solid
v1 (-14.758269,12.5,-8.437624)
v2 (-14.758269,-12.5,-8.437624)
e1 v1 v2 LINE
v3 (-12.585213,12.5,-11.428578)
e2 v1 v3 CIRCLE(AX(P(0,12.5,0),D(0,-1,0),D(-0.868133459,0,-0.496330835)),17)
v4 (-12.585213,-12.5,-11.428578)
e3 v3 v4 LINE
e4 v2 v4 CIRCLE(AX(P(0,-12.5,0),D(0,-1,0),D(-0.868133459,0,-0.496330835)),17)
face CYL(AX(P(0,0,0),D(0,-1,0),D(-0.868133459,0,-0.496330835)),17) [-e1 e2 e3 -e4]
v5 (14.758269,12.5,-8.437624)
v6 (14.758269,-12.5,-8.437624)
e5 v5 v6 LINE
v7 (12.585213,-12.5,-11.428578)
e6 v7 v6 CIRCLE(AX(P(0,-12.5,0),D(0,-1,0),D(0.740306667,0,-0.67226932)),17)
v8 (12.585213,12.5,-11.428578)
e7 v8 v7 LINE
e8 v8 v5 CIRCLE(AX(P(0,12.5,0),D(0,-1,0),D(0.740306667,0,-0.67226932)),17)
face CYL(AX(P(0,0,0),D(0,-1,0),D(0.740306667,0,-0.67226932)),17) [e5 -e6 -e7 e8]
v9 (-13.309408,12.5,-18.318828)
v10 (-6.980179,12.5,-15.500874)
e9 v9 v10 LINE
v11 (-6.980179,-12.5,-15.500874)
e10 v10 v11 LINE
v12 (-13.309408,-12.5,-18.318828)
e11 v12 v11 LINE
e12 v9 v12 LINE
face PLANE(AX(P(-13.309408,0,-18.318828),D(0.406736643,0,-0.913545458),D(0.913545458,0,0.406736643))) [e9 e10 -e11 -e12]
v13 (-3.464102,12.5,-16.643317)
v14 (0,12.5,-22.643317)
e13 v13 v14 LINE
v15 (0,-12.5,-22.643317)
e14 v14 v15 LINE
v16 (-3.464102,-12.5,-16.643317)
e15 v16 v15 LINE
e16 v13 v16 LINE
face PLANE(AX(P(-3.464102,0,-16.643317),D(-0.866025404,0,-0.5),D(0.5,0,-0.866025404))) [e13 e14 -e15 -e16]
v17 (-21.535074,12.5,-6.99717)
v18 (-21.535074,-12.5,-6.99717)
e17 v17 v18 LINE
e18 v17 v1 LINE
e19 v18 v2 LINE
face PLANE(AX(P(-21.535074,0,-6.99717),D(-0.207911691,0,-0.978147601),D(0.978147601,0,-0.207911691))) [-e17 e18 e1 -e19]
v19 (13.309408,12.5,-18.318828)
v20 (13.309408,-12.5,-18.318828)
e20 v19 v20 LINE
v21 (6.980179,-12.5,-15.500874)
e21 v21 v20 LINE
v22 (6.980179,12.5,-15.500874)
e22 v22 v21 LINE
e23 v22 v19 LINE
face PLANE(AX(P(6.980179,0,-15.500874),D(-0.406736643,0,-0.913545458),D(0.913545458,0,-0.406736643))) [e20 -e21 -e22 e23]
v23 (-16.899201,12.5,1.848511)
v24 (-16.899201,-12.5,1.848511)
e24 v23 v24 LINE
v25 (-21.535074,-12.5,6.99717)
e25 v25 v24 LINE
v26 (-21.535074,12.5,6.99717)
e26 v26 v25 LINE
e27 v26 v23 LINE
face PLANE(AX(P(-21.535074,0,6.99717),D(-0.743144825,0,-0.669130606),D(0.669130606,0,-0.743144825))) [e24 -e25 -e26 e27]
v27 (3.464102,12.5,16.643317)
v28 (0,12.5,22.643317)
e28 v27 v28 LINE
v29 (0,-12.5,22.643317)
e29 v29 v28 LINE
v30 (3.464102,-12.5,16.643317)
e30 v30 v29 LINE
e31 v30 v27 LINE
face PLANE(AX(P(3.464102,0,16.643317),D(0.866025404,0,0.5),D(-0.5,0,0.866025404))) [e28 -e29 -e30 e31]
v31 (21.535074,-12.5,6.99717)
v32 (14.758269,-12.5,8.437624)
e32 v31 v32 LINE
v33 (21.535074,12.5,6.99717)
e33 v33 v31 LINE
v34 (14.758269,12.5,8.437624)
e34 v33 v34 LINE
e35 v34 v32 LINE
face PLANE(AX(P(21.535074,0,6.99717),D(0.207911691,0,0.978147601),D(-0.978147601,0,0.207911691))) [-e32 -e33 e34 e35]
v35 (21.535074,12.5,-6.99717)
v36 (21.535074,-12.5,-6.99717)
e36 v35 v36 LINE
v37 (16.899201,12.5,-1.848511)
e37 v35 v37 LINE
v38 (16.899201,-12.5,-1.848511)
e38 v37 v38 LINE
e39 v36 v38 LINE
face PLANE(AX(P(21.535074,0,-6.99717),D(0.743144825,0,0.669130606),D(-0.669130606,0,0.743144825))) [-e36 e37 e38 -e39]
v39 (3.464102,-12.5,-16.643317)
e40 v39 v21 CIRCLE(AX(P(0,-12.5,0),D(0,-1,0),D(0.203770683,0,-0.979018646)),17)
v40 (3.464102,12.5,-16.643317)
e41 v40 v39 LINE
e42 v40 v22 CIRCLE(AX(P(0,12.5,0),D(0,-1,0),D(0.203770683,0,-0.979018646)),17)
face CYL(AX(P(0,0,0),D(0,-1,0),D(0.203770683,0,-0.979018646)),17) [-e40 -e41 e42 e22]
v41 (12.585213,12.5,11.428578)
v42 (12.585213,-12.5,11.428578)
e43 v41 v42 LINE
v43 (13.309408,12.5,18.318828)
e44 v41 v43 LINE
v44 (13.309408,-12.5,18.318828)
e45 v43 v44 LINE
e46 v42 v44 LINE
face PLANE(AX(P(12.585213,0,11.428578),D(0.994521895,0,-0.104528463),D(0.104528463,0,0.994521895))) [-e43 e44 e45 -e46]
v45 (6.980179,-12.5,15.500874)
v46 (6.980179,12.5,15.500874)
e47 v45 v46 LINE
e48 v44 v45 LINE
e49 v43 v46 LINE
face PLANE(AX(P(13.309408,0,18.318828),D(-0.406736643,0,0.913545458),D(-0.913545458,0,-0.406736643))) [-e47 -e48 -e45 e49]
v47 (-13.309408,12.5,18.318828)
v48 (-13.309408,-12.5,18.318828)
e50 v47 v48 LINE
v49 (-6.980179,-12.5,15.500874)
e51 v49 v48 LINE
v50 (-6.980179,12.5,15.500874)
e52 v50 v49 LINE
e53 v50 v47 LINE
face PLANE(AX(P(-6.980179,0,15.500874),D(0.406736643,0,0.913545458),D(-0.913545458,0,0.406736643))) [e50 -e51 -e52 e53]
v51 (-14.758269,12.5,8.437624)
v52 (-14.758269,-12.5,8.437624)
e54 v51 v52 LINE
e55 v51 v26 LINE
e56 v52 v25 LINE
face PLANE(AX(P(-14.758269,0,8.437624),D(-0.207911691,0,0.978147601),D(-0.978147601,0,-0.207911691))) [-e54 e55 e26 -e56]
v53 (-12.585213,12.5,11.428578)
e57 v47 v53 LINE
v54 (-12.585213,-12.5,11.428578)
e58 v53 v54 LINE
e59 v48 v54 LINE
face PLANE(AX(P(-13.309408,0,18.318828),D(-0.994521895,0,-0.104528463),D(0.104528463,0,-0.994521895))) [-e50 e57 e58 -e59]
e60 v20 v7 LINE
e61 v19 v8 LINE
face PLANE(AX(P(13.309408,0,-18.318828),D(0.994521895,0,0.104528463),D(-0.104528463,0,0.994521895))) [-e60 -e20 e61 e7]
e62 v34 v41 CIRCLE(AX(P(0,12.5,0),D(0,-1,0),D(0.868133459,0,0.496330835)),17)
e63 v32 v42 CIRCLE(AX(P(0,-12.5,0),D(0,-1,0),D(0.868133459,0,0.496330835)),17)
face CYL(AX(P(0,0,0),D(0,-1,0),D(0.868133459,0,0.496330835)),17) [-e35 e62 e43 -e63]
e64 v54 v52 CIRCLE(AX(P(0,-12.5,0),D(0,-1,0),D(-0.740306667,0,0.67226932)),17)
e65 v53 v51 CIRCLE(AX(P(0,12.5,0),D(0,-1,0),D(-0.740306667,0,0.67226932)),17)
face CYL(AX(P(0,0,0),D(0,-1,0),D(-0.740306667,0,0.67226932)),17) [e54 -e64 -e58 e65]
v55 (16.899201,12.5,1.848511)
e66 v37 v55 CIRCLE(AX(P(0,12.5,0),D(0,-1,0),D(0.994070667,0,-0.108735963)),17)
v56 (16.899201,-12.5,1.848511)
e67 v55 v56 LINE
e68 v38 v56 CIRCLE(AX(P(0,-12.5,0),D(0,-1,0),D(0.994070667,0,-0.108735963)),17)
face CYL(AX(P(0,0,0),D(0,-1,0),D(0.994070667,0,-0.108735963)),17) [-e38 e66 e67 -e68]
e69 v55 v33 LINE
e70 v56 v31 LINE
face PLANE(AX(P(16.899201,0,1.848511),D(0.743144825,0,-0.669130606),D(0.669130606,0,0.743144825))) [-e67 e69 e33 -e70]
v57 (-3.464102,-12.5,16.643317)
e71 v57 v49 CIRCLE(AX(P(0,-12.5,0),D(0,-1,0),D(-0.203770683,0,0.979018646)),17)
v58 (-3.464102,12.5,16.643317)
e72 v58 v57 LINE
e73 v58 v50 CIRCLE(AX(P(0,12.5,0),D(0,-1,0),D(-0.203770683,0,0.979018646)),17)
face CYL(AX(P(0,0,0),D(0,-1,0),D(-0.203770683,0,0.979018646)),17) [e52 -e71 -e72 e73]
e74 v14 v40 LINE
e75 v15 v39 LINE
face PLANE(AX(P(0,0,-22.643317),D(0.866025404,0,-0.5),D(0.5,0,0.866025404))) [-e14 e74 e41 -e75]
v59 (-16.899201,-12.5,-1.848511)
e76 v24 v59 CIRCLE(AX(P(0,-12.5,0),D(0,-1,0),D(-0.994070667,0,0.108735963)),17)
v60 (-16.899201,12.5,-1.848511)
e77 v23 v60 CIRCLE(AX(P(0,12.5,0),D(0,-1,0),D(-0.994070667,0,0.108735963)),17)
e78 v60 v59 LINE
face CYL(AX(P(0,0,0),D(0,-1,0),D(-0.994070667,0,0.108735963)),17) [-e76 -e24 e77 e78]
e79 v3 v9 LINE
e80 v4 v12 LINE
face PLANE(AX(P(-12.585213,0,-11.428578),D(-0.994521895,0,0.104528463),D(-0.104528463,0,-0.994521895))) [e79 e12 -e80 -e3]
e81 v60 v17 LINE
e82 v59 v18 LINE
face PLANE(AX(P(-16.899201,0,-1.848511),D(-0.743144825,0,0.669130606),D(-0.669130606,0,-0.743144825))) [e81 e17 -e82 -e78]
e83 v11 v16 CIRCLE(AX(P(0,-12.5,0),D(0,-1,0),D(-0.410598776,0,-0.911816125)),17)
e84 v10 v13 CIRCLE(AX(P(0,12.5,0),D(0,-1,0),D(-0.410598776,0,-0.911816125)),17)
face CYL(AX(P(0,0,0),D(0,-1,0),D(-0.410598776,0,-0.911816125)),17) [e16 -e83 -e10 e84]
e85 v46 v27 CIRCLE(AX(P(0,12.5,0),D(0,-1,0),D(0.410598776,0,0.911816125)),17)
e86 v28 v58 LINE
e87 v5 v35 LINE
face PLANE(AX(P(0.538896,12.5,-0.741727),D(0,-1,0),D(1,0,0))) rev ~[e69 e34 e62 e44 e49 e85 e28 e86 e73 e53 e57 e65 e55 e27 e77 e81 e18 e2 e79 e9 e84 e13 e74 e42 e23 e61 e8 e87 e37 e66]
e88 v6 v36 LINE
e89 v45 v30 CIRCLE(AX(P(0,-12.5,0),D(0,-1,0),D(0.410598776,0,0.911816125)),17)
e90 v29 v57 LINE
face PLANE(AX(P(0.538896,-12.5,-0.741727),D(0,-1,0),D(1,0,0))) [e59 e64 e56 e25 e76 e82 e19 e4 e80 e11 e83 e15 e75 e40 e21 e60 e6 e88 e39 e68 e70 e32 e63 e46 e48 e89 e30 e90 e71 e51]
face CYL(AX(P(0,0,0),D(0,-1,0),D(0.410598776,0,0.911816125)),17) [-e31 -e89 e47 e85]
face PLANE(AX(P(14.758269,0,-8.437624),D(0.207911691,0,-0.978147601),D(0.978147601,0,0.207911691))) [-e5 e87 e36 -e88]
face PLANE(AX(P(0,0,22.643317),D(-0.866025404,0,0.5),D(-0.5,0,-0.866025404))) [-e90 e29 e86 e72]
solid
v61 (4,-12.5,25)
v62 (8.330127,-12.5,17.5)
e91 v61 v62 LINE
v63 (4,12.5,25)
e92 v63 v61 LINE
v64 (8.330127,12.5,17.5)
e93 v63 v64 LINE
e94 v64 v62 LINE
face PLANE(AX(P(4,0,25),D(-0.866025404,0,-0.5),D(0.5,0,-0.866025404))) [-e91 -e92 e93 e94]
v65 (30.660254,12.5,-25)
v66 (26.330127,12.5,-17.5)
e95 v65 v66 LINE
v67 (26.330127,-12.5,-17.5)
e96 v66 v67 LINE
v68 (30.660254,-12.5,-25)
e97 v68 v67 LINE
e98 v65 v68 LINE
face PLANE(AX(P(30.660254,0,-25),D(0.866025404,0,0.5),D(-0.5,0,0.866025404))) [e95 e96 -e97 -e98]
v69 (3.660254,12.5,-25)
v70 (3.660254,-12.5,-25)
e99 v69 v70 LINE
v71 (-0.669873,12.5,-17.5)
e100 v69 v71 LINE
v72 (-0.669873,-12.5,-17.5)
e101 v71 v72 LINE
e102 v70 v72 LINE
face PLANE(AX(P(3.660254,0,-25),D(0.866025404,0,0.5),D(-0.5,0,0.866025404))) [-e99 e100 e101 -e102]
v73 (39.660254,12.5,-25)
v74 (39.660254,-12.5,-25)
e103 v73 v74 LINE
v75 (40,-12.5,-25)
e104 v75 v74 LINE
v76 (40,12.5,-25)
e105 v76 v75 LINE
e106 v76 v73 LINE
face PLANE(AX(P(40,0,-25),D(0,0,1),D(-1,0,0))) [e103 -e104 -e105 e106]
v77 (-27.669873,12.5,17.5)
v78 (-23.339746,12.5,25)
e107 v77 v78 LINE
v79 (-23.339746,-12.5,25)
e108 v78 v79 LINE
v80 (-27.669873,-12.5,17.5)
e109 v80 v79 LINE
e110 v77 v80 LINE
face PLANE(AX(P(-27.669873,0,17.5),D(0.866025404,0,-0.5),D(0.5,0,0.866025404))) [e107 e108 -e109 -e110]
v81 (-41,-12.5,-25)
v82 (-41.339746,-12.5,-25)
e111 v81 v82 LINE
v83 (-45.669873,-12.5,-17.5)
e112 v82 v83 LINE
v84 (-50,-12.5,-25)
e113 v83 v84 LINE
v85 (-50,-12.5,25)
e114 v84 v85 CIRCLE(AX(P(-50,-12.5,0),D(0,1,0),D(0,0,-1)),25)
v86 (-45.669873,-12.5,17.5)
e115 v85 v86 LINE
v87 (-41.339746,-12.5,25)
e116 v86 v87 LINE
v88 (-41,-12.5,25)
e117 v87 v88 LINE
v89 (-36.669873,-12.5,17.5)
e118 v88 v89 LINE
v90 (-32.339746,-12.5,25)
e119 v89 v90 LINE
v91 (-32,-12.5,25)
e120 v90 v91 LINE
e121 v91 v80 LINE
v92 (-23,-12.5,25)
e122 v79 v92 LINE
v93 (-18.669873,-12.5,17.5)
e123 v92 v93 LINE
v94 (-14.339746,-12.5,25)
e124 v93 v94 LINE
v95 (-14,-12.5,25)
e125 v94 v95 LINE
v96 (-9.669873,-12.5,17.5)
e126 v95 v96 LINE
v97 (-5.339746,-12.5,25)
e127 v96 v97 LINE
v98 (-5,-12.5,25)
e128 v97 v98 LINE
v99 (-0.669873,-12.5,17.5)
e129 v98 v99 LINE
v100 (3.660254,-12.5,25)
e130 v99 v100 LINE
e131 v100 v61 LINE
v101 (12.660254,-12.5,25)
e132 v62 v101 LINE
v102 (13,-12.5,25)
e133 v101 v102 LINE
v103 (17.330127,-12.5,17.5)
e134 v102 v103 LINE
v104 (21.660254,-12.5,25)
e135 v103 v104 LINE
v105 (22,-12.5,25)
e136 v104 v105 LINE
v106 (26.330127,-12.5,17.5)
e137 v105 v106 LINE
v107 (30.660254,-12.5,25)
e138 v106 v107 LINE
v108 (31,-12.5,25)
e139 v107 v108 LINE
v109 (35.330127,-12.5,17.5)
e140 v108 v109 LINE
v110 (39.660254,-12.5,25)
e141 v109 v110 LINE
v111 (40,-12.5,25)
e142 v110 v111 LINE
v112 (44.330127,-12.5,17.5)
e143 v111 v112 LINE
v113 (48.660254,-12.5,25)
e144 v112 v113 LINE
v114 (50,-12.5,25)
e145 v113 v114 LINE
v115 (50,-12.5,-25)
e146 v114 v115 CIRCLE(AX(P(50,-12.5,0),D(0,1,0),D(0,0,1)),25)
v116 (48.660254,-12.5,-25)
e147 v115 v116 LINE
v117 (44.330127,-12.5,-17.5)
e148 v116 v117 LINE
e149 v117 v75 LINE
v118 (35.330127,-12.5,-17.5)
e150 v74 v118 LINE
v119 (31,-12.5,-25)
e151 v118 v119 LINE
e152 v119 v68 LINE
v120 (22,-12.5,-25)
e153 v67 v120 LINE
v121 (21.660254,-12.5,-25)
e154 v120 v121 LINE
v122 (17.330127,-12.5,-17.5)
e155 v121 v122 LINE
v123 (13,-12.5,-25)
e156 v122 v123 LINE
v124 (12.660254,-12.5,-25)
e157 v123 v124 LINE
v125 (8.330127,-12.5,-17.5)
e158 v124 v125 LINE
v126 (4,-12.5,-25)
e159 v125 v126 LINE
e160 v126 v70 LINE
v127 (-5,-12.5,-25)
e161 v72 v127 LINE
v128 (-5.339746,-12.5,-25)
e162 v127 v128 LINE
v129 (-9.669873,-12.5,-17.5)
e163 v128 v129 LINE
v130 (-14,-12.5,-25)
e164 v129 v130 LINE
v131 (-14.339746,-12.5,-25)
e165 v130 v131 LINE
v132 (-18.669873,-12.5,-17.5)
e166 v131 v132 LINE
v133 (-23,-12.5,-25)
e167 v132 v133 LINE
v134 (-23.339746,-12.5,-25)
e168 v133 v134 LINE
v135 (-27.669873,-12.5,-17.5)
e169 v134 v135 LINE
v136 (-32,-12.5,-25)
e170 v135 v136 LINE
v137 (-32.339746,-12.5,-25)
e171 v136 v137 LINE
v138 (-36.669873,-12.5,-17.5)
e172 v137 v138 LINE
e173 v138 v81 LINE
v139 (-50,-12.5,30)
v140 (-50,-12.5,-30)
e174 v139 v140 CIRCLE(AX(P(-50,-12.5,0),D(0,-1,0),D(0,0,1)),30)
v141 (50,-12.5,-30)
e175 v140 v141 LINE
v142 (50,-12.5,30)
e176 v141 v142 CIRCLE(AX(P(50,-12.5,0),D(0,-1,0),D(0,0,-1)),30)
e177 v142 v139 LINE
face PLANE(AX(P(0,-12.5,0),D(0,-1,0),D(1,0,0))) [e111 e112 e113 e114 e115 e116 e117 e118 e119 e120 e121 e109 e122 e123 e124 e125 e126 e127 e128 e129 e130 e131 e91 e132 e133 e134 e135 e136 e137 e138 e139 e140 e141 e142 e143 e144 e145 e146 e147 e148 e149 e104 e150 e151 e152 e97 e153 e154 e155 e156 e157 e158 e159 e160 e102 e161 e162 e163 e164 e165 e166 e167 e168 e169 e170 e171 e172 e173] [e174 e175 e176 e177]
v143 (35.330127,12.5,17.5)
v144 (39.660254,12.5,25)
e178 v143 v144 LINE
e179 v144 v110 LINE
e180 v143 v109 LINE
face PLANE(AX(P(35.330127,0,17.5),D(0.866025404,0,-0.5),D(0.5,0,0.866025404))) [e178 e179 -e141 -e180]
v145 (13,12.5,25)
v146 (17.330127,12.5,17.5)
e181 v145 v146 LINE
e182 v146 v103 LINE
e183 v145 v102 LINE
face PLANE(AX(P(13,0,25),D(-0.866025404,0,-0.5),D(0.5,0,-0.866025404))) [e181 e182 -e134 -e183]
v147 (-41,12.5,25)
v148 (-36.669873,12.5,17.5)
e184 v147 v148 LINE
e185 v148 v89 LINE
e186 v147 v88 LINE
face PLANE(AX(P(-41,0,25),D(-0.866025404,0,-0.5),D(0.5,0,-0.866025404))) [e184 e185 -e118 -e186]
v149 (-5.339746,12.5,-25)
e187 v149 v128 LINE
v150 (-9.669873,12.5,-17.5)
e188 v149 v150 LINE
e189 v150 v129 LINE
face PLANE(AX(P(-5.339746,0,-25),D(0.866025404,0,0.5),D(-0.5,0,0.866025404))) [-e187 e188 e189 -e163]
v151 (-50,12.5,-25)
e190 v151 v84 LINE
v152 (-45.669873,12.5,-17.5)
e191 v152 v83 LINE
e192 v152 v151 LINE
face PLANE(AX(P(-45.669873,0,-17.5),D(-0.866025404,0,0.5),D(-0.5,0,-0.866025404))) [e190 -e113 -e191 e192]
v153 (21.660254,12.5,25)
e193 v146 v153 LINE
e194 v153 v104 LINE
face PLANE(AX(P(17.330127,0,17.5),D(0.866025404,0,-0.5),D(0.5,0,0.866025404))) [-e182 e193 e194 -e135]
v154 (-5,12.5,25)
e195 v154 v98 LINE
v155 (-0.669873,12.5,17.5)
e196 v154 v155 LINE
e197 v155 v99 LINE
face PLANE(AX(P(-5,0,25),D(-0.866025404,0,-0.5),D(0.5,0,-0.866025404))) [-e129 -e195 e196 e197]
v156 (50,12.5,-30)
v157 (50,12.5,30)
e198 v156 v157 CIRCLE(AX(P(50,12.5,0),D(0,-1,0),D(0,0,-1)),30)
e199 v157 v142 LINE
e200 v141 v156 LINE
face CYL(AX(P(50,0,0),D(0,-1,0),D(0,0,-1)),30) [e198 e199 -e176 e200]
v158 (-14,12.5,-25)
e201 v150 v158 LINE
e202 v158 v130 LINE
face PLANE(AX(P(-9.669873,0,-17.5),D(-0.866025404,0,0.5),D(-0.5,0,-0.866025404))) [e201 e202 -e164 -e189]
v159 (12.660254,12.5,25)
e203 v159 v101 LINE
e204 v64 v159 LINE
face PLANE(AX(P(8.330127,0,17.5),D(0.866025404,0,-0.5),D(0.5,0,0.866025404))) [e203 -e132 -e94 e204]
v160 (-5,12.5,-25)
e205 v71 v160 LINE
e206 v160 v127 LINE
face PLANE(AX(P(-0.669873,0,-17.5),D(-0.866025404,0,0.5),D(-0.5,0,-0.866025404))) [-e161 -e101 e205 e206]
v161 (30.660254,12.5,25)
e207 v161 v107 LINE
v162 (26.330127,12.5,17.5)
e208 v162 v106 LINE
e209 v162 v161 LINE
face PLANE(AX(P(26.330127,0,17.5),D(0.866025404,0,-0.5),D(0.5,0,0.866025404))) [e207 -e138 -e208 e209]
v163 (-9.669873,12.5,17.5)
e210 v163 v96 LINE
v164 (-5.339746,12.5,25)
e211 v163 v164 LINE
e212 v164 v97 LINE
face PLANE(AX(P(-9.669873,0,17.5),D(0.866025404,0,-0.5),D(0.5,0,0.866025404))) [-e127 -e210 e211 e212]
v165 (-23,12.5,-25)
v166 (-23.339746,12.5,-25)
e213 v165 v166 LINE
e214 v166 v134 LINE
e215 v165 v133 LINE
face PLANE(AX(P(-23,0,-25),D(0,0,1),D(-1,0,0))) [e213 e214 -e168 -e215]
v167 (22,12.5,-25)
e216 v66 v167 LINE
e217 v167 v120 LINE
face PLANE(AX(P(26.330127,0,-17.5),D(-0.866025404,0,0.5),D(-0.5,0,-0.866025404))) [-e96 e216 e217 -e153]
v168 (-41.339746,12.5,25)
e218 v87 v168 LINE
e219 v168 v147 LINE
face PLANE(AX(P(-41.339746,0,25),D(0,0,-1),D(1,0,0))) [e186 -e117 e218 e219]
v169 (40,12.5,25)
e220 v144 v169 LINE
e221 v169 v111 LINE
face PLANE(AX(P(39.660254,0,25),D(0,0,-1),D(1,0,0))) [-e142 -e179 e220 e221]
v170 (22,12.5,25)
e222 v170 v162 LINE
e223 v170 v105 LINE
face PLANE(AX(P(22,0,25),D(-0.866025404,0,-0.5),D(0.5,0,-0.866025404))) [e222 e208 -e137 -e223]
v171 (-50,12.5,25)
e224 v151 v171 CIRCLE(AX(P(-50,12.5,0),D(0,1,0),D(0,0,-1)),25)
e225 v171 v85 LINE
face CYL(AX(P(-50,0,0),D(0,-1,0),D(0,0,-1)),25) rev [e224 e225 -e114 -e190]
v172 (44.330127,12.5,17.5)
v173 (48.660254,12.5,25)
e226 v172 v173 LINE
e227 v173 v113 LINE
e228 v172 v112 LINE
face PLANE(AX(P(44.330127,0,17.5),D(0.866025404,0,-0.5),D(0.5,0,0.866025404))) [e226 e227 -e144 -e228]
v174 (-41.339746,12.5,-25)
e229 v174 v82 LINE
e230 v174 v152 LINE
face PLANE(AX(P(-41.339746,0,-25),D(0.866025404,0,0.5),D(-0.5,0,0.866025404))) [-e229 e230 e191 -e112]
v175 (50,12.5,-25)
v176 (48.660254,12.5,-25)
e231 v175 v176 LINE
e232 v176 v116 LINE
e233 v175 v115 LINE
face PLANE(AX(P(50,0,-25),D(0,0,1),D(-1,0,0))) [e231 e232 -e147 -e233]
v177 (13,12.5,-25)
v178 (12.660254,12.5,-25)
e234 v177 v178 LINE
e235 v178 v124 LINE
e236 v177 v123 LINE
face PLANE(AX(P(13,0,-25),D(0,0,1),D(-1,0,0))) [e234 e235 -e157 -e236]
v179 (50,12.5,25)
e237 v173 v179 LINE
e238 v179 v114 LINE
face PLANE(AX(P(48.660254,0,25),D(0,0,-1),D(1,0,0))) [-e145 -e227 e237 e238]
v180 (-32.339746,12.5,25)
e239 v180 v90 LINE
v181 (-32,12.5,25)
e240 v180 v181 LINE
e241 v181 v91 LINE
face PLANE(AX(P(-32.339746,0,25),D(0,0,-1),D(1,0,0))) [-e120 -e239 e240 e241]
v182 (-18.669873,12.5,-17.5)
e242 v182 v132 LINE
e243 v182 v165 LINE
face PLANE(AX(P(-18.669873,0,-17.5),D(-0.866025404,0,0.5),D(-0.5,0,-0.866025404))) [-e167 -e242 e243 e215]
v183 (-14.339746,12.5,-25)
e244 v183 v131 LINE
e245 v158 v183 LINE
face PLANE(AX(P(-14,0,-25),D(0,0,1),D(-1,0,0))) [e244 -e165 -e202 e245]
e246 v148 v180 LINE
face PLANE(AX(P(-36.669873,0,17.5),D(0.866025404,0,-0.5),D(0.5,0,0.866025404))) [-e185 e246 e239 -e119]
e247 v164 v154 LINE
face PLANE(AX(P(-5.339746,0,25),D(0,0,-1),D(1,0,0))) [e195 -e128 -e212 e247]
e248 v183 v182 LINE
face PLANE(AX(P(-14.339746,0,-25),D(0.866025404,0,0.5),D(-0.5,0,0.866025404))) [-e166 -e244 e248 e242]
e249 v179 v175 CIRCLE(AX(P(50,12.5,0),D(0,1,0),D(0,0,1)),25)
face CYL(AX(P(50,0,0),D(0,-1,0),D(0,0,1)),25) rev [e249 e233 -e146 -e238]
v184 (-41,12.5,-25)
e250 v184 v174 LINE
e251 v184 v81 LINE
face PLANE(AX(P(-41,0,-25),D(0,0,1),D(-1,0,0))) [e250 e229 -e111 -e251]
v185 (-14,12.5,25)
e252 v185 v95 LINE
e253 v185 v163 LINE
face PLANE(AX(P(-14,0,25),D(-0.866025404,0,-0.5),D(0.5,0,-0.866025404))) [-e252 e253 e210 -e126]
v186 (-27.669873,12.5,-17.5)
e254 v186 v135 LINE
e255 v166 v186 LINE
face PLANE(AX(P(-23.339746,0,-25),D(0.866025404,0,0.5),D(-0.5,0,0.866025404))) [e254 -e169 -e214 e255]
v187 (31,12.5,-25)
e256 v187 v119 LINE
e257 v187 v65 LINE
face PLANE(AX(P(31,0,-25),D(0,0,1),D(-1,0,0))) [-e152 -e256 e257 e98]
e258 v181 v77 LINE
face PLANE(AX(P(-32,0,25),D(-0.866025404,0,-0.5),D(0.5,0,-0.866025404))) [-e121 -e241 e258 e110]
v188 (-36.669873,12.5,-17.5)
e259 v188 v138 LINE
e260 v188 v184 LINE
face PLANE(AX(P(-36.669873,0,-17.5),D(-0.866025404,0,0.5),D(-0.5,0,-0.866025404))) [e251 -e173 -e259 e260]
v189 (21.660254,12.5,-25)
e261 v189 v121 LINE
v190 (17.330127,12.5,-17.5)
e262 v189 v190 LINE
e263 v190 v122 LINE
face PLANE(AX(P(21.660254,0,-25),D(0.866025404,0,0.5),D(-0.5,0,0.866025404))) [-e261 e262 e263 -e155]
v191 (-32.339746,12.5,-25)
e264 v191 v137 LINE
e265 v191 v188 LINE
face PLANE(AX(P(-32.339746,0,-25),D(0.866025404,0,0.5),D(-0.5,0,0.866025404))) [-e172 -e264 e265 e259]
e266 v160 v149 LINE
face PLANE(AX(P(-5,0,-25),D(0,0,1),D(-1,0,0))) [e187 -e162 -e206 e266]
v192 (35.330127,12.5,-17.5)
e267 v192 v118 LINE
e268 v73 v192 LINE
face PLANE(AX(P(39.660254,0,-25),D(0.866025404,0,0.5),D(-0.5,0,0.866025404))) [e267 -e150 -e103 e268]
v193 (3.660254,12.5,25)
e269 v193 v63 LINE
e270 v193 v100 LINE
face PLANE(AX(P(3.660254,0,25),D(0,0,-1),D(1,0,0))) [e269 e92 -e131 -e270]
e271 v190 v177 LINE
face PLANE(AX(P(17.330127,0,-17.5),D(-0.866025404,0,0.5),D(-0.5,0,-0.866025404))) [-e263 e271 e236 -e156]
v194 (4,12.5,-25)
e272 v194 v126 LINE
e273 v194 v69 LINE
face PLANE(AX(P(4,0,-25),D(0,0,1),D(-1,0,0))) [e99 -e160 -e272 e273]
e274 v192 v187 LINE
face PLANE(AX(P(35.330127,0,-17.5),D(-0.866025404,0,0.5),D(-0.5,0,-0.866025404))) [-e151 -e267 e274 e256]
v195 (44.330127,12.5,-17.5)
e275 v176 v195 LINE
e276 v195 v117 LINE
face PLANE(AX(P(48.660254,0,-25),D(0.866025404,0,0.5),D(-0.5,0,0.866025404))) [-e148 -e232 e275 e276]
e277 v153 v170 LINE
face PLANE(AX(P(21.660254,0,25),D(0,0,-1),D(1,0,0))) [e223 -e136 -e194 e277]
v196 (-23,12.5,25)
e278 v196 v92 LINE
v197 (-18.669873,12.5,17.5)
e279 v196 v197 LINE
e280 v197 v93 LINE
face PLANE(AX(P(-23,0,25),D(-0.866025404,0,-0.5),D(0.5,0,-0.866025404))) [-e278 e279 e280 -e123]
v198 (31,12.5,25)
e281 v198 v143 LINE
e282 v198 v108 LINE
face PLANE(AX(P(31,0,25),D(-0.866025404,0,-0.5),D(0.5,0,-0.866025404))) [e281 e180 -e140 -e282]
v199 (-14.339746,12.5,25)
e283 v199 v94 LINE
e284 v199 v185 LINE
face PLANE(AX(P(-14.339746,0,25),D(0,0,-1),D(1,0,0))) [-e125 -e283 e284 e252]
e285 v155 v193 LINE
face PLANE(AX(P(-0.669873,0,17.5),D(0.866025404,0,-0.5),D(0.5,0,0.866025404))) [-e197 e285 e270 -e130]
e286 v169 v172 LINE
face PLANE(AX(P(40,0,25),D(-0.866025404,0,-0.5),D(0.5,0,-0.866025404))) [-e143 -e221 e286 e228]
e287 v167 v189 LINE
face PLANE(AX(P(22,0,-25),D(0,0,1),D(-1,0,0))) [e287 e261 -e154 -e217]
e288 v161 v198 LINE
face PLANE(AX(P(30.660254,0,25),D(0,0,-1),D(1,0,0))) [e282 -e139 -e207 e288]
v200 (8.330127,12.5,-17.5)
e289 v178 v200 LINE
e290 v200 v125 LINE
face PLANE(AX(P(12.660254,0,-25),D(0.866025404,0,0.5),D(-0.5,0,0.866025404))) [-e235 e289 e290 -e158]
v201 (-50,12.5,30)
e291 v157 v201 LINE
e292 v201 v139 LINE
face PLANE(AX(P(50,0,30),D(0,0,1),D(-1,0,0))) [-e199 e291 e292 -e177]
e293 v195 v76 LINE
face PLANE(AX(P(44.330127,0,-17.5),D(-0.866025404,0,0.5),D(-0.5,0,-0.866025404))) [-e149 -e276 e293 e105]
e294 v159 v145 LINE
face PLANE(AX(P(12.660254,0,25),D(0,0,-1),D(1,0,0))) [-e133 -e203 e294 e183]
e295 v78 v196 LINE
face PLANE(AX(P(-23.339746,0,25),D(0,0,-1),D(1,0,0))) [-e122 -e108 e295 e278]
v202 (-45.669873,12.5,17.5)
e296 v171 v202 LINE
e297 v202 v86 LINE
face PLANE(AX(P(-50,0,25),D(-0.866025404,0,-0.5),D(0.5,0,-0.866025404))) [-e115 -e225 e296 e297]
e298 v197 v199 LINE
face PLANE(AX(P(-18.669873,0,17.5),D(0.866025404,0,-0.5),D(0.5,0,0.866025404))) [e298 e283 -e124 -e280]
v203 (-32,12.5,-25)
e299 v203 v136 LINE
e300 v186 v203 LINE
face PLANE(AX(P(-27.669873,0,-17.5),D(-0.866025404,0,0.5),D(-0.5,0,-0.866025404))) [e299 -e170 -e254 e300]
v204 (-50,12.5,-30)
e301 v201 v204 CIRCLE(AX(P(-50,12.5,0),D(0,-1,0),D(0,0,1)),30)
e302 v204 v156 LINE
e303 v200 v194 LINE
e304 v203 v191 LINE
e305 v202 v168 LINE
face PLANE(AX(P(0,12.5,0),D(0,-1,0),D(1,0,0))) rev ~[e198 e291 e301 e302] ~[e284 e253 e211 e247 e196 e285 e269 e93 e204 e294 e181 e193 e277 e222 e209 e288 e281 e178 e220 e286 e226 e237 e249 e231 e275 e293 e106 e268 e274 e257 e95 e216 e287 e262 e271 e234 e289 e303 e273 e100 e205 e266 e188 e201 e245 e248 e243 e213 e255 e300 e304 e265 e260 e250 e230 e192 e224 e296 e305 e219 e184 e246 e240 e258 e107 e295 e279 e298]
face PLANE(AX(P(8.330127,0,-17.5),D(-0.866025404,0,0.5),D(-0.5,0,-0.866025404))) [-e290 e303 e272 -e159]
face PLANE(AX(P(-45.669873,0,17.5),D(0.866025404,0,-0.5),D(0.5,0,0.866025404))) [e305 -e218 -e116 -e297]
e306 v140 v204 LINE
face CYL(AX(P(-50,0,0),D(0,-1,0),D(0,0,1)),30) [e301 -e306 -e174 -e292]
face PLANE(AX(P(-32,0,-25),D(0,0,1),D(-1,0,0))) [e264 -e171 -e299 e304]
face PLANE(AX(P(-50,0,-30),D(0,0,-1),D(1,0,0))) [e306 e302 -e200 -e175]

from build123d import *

# Parameters (mm, degrees)
F1_DEPTH = 12.5
F3_DEPTH = 12.5


with BuildPart() as f1:
    # F0 (on Front) → F1 (new body, symmetric)
    with BuildSketch(Plane.XZ):
        with BuildLine():
            ThreePointArc((50, -30), (80, 0), (50, 30))
            Line((50, 30), (-50, 30))
            ThreePointArc((-50, 30), (-80, 0), (-50, -30))
            Line((-50, -30), (50, -30))
        make_face()
        with BuildLine():
            Line((48.6602540378, 25), (50, 25))
            ThreePointArc((50, 25), (75, 0), (50, -25))
            Line((50, -25), (48.6602540378, -25))
            Line((48.6602540378, -25), (40, -25))
            Line((40, -25), (39.6602540378, -25))
            Line((39.6602540378, -25), (31, -25))
            Line((31, -25), (30.6602540378, -25))
            Line((30.6602540378, -25), (22, -25))
            Line((22, -25), (21.6602540378, -25))
            Line((21.6602540378, -25), (13, -25))
            Line((13, -25), (12.6602540378, -25))
            Line((12.6602540378, -25), (4, -25))
            Line((4, -25), (3.6602540378, -25))
            Line((3.6602540378, -25), (-5, -25))
            Line((-5, -25), (-5.3397459622, -25))
            Line((-5.3397459622, -25), (-14, -25))
            Line((-14, -25), (-14.3397459622, -25))
            Line((-14.3397459622, -25), (-23, -25))
            Line((-23, -25), (-23.3397459622, -25))
            Line((-23.3397459622, -25), (-32, -25))
            Line((-32, -25), (-32.3397459622, -25))
            Line((-32.3397459622, -25), (-41, -25))
            Line((-41, -25), (-41.3397459622, -25))
            Line((-41.3397459622, -25), (-50, -25))
            ThreePointArc((-50, -25), (-75, 0), (-50, 25))
            Line((-50, 25), (-41.3397459622, 25))
            Line((-41.3397459622, 25), (-41, 25))
            Line((-41, 25), (-32.3397459622, 25))
            Line((-32.3397459622, 25), (-32, 25))
            Line((-32, 25), (-23.3397459622, 25))
            Line((-23.3397459622, 25), (-23, 25))
            Line((-23, 25), (-14.3397459622, 25))
            Line((-14.3397459622, 25), (-14, 25))
            Line((-14, 25), (-5.3397459622, 25))
            Line((-5.3397459622, 25), (-5, 25))
            Line((-5, 25), (3.6602540378, 25))
            Line((3.6602540378, 25), (4, 25))
            Line((4, 25), (12.6602540378, 25))
            Line((12.6602540378, 25), (13, 25))
            Line((13, 25), (21.6602540378, 25))
            Line((21.6602540378, 25), (22, 25))
            Line((22, 25), (30.6602540378, 25))
            Line((30.6602540378, 25), (31, 25))
            Line((31, 25), (39.6602540378, 25))
            Line((39.6602540378, 25), (40, 25))
            Line((40, 25), (48.6602540378, 25))
        make_face(mode=Mode.SUBTRACT)
        Polygon((44.3301270189, 17.5), (48.6602540378, 25), (40, 25), align=None)
        Polygon((40, -25), (48.6602540378, -25), (44.3301270189, -17.5), align=None)
        Polygon((35.3301270189, 17.5), (39.6602540378, 25), (31, 25), align=None)
        Polygon((31, -25), (39.6602540378, -25), (35.3301270189, -17.5), align=None)
        Polygon((26.3301270189, 17.5), (30.6602540378, 25), (22, 25), align=None)
        Polygon((22, -25), (30.6602540378, -25), (26.3301270189, -17.5), align=None)
        Polygon((17.3301270189, 17.5), (21.6602540378, 25), (13, 25), align=None)
        Polygon((13, -25), (21.6602540378, -25), (17.3301270189, -17.5), align=None)
        Polygon((8.3301270189, 17.5), (12.6602540378, 25), (4, 25), align=None)
        Polygon((4, -25), (12.6602540378, -25), (8.3301270189, -17.5), align=None)
        Polygon((-0.6698729811, 17.5), (3.6602540378, 25), (-5, 25), align=None)
        Polygon((-5, -25), (3.6602540378, -25), (-0.6698729811, -17.5), align=None)
        Polygon((-9.6698729811, 17.5), (-5.3397459622, 25), (-14, 25), align=None)
        Polygon((-14, -25), (-5.3397459622, -25), (-9.6698729811, -17.5), align=None)
        Polygon((-18.6698729811, 17.5), (-14.3397459622, 25), (-23, 25), align=None)
        Polygon((-23, -25), (-14.3397459622, -25), (-18.6698729811, -17.5), align=None)
        Polygon((-27.6698729811, 17.5), (-23.3397459622, 25), (-32, 25), align=None)
        Polygon((-32, -25), (-23.3397459622, -25), (-27.6698729811, -17.5), align=None)
        Polygon((-36.6698729811, 17.5), (-32.3397459622, 25), (-41, 25), align=None)
        Polygon((-41, -25), (-32.3397459622, -25), (-36.6698729811, -17.5), align=None)
        Polygon((-45.6698729811, 17.5), (-41.3397459622, 25), (-50, 25), align=None)
        Polygon((-50, -25), (-41.3397459622, -25), (-45.6698729811, -17.5), align=None)
    extrude(amount=F1_DEPTH, both=True)


with BuildPart() as f3:
    # F2 (on Front) → F3 (new body, symmetric)
    with BuildSketch(Plane.XZ):
        with BuildLine():
            Line((0, 22.6433169771), (-3.4641016151, 16.6433169771))
            ThreePointArc((-3.4641016151, 16.6433169771), (-5.2532889044, 16.167960777), (-6.9801791915, 15.5008741191))
            ThreePointArc((-6.9801791915, 15.5008741191), (-9.992349289, 13.7532889044), (-12.5852133453, 11.4285784354))
            ThreePointArc((-12.5852133453, 11.4285784354), (-13.7532889044, 9.992349289), (-14.7582687945, 8.4376242029))
            Line((-14.7582687945, 8.4376242029), (-21.5350741616, 6.9971697549))
            Line((-21.5350741616, 6.9971697549), (-16.8992013331, 1.8485113745))
            ThreePointArc((-16.8992013331, 1.8485113745), (-17, 0), (-16.8992013331, -1.8485113745))
            Line((-16.8992013331, -1.8485113745), (-21.5350741616, -6.9971697549))
            Line((-21.5350741616, -6.9971697549), (-14.7582687945, -8.4376242029))
            ThreePointArc((-14.7582687945, -8.4376242029), (-13.7532889044, -9.992349289), (-12.5852133453, -11.4285784354))
            Line((-12.5852133453, -11.4285784354), (-13.3094077821, -18.3188282435))
            Line((-13.3094077821, -18.3188282435), (-6.9801791915, -15.5008741191))
            ThreePointArc((-6.9801791915, -15.5008741191), (-5.2532889044, -16.167960777), (-3.4641016151, -16.6433169771))
            Line((-3.4641016151, -16.6433169771), (0, -22.6433169771))
            Line((0, -22.6433169771), (3.4641016151, -16.6433169771))
            ThreePointArc((3.4641016151, -16.6433169771), (5.2532889044, -16.167960777), (6.9801791915, -15.5008741191))
            Line((6.9801791915, -15.5008741191), (13.3094077821, -18.3188282435))
            Line((13.3094077821, -18.3188282435), (12.5852133453, -11.4285784354))
            ThreePointArc((12.5852133453, -11.4285784354), (13.7532889044, -9.992349289), (14.7582687945, -8.4376242029))
            Line((14.7582687945, -8.4376242029), (21.5350741616, -6.9971697549))
            Line((21.5350741616, -6.9971697549), (16.8992013331, -1.8485113745))
            ThreePointArc((16.8992013331, -1.8485113745), (17, 0), (16.8992013331, 1.8485113745))
            Line((16.8992013331, 1.8485113745), (21.5350741616, 6.9971697549))
            Line((21.5350741616, 6.9971697549), (14.7582687945, 8.4376242029))
            ThreePointArc((14.7582687945, 8.4376242029), (13.7532889044, 9.992349289), (12.5852133453, 11.4285784354))
            Line((12.5852133453, 11.4285784354), (13.3094077821, 18.3188282435))
            Line((13.3094077821, 18.3188282435), (6.9801791915, 15.5008741191))
            ThreePointArc((6.9801791915, 15.5008741191), (5.2532889044, 16.167960777), (3.4641016151, 16.6433169771))
            Line((3.4641016151, 16.6433169771), (0, 22.6433169771))
        make_face()
        with BuildLine():
            ThreePointArc((-12.5852133453, 11.4285784354), (-9.992349289, 13.7532889044), (-6.9801791915, 15.5008741191))
            Line((-6.9801791915, 15.5008741191), (-13.3094077821, 18.3188282435))
            Line((-13.3094077821, 18.3188282435), (-12.5852133453, 11.4285784354))
        make_face()
    extrude(amount=F3_DEPTH, both=True)


solid = Compound([f1.part, f3.part])
